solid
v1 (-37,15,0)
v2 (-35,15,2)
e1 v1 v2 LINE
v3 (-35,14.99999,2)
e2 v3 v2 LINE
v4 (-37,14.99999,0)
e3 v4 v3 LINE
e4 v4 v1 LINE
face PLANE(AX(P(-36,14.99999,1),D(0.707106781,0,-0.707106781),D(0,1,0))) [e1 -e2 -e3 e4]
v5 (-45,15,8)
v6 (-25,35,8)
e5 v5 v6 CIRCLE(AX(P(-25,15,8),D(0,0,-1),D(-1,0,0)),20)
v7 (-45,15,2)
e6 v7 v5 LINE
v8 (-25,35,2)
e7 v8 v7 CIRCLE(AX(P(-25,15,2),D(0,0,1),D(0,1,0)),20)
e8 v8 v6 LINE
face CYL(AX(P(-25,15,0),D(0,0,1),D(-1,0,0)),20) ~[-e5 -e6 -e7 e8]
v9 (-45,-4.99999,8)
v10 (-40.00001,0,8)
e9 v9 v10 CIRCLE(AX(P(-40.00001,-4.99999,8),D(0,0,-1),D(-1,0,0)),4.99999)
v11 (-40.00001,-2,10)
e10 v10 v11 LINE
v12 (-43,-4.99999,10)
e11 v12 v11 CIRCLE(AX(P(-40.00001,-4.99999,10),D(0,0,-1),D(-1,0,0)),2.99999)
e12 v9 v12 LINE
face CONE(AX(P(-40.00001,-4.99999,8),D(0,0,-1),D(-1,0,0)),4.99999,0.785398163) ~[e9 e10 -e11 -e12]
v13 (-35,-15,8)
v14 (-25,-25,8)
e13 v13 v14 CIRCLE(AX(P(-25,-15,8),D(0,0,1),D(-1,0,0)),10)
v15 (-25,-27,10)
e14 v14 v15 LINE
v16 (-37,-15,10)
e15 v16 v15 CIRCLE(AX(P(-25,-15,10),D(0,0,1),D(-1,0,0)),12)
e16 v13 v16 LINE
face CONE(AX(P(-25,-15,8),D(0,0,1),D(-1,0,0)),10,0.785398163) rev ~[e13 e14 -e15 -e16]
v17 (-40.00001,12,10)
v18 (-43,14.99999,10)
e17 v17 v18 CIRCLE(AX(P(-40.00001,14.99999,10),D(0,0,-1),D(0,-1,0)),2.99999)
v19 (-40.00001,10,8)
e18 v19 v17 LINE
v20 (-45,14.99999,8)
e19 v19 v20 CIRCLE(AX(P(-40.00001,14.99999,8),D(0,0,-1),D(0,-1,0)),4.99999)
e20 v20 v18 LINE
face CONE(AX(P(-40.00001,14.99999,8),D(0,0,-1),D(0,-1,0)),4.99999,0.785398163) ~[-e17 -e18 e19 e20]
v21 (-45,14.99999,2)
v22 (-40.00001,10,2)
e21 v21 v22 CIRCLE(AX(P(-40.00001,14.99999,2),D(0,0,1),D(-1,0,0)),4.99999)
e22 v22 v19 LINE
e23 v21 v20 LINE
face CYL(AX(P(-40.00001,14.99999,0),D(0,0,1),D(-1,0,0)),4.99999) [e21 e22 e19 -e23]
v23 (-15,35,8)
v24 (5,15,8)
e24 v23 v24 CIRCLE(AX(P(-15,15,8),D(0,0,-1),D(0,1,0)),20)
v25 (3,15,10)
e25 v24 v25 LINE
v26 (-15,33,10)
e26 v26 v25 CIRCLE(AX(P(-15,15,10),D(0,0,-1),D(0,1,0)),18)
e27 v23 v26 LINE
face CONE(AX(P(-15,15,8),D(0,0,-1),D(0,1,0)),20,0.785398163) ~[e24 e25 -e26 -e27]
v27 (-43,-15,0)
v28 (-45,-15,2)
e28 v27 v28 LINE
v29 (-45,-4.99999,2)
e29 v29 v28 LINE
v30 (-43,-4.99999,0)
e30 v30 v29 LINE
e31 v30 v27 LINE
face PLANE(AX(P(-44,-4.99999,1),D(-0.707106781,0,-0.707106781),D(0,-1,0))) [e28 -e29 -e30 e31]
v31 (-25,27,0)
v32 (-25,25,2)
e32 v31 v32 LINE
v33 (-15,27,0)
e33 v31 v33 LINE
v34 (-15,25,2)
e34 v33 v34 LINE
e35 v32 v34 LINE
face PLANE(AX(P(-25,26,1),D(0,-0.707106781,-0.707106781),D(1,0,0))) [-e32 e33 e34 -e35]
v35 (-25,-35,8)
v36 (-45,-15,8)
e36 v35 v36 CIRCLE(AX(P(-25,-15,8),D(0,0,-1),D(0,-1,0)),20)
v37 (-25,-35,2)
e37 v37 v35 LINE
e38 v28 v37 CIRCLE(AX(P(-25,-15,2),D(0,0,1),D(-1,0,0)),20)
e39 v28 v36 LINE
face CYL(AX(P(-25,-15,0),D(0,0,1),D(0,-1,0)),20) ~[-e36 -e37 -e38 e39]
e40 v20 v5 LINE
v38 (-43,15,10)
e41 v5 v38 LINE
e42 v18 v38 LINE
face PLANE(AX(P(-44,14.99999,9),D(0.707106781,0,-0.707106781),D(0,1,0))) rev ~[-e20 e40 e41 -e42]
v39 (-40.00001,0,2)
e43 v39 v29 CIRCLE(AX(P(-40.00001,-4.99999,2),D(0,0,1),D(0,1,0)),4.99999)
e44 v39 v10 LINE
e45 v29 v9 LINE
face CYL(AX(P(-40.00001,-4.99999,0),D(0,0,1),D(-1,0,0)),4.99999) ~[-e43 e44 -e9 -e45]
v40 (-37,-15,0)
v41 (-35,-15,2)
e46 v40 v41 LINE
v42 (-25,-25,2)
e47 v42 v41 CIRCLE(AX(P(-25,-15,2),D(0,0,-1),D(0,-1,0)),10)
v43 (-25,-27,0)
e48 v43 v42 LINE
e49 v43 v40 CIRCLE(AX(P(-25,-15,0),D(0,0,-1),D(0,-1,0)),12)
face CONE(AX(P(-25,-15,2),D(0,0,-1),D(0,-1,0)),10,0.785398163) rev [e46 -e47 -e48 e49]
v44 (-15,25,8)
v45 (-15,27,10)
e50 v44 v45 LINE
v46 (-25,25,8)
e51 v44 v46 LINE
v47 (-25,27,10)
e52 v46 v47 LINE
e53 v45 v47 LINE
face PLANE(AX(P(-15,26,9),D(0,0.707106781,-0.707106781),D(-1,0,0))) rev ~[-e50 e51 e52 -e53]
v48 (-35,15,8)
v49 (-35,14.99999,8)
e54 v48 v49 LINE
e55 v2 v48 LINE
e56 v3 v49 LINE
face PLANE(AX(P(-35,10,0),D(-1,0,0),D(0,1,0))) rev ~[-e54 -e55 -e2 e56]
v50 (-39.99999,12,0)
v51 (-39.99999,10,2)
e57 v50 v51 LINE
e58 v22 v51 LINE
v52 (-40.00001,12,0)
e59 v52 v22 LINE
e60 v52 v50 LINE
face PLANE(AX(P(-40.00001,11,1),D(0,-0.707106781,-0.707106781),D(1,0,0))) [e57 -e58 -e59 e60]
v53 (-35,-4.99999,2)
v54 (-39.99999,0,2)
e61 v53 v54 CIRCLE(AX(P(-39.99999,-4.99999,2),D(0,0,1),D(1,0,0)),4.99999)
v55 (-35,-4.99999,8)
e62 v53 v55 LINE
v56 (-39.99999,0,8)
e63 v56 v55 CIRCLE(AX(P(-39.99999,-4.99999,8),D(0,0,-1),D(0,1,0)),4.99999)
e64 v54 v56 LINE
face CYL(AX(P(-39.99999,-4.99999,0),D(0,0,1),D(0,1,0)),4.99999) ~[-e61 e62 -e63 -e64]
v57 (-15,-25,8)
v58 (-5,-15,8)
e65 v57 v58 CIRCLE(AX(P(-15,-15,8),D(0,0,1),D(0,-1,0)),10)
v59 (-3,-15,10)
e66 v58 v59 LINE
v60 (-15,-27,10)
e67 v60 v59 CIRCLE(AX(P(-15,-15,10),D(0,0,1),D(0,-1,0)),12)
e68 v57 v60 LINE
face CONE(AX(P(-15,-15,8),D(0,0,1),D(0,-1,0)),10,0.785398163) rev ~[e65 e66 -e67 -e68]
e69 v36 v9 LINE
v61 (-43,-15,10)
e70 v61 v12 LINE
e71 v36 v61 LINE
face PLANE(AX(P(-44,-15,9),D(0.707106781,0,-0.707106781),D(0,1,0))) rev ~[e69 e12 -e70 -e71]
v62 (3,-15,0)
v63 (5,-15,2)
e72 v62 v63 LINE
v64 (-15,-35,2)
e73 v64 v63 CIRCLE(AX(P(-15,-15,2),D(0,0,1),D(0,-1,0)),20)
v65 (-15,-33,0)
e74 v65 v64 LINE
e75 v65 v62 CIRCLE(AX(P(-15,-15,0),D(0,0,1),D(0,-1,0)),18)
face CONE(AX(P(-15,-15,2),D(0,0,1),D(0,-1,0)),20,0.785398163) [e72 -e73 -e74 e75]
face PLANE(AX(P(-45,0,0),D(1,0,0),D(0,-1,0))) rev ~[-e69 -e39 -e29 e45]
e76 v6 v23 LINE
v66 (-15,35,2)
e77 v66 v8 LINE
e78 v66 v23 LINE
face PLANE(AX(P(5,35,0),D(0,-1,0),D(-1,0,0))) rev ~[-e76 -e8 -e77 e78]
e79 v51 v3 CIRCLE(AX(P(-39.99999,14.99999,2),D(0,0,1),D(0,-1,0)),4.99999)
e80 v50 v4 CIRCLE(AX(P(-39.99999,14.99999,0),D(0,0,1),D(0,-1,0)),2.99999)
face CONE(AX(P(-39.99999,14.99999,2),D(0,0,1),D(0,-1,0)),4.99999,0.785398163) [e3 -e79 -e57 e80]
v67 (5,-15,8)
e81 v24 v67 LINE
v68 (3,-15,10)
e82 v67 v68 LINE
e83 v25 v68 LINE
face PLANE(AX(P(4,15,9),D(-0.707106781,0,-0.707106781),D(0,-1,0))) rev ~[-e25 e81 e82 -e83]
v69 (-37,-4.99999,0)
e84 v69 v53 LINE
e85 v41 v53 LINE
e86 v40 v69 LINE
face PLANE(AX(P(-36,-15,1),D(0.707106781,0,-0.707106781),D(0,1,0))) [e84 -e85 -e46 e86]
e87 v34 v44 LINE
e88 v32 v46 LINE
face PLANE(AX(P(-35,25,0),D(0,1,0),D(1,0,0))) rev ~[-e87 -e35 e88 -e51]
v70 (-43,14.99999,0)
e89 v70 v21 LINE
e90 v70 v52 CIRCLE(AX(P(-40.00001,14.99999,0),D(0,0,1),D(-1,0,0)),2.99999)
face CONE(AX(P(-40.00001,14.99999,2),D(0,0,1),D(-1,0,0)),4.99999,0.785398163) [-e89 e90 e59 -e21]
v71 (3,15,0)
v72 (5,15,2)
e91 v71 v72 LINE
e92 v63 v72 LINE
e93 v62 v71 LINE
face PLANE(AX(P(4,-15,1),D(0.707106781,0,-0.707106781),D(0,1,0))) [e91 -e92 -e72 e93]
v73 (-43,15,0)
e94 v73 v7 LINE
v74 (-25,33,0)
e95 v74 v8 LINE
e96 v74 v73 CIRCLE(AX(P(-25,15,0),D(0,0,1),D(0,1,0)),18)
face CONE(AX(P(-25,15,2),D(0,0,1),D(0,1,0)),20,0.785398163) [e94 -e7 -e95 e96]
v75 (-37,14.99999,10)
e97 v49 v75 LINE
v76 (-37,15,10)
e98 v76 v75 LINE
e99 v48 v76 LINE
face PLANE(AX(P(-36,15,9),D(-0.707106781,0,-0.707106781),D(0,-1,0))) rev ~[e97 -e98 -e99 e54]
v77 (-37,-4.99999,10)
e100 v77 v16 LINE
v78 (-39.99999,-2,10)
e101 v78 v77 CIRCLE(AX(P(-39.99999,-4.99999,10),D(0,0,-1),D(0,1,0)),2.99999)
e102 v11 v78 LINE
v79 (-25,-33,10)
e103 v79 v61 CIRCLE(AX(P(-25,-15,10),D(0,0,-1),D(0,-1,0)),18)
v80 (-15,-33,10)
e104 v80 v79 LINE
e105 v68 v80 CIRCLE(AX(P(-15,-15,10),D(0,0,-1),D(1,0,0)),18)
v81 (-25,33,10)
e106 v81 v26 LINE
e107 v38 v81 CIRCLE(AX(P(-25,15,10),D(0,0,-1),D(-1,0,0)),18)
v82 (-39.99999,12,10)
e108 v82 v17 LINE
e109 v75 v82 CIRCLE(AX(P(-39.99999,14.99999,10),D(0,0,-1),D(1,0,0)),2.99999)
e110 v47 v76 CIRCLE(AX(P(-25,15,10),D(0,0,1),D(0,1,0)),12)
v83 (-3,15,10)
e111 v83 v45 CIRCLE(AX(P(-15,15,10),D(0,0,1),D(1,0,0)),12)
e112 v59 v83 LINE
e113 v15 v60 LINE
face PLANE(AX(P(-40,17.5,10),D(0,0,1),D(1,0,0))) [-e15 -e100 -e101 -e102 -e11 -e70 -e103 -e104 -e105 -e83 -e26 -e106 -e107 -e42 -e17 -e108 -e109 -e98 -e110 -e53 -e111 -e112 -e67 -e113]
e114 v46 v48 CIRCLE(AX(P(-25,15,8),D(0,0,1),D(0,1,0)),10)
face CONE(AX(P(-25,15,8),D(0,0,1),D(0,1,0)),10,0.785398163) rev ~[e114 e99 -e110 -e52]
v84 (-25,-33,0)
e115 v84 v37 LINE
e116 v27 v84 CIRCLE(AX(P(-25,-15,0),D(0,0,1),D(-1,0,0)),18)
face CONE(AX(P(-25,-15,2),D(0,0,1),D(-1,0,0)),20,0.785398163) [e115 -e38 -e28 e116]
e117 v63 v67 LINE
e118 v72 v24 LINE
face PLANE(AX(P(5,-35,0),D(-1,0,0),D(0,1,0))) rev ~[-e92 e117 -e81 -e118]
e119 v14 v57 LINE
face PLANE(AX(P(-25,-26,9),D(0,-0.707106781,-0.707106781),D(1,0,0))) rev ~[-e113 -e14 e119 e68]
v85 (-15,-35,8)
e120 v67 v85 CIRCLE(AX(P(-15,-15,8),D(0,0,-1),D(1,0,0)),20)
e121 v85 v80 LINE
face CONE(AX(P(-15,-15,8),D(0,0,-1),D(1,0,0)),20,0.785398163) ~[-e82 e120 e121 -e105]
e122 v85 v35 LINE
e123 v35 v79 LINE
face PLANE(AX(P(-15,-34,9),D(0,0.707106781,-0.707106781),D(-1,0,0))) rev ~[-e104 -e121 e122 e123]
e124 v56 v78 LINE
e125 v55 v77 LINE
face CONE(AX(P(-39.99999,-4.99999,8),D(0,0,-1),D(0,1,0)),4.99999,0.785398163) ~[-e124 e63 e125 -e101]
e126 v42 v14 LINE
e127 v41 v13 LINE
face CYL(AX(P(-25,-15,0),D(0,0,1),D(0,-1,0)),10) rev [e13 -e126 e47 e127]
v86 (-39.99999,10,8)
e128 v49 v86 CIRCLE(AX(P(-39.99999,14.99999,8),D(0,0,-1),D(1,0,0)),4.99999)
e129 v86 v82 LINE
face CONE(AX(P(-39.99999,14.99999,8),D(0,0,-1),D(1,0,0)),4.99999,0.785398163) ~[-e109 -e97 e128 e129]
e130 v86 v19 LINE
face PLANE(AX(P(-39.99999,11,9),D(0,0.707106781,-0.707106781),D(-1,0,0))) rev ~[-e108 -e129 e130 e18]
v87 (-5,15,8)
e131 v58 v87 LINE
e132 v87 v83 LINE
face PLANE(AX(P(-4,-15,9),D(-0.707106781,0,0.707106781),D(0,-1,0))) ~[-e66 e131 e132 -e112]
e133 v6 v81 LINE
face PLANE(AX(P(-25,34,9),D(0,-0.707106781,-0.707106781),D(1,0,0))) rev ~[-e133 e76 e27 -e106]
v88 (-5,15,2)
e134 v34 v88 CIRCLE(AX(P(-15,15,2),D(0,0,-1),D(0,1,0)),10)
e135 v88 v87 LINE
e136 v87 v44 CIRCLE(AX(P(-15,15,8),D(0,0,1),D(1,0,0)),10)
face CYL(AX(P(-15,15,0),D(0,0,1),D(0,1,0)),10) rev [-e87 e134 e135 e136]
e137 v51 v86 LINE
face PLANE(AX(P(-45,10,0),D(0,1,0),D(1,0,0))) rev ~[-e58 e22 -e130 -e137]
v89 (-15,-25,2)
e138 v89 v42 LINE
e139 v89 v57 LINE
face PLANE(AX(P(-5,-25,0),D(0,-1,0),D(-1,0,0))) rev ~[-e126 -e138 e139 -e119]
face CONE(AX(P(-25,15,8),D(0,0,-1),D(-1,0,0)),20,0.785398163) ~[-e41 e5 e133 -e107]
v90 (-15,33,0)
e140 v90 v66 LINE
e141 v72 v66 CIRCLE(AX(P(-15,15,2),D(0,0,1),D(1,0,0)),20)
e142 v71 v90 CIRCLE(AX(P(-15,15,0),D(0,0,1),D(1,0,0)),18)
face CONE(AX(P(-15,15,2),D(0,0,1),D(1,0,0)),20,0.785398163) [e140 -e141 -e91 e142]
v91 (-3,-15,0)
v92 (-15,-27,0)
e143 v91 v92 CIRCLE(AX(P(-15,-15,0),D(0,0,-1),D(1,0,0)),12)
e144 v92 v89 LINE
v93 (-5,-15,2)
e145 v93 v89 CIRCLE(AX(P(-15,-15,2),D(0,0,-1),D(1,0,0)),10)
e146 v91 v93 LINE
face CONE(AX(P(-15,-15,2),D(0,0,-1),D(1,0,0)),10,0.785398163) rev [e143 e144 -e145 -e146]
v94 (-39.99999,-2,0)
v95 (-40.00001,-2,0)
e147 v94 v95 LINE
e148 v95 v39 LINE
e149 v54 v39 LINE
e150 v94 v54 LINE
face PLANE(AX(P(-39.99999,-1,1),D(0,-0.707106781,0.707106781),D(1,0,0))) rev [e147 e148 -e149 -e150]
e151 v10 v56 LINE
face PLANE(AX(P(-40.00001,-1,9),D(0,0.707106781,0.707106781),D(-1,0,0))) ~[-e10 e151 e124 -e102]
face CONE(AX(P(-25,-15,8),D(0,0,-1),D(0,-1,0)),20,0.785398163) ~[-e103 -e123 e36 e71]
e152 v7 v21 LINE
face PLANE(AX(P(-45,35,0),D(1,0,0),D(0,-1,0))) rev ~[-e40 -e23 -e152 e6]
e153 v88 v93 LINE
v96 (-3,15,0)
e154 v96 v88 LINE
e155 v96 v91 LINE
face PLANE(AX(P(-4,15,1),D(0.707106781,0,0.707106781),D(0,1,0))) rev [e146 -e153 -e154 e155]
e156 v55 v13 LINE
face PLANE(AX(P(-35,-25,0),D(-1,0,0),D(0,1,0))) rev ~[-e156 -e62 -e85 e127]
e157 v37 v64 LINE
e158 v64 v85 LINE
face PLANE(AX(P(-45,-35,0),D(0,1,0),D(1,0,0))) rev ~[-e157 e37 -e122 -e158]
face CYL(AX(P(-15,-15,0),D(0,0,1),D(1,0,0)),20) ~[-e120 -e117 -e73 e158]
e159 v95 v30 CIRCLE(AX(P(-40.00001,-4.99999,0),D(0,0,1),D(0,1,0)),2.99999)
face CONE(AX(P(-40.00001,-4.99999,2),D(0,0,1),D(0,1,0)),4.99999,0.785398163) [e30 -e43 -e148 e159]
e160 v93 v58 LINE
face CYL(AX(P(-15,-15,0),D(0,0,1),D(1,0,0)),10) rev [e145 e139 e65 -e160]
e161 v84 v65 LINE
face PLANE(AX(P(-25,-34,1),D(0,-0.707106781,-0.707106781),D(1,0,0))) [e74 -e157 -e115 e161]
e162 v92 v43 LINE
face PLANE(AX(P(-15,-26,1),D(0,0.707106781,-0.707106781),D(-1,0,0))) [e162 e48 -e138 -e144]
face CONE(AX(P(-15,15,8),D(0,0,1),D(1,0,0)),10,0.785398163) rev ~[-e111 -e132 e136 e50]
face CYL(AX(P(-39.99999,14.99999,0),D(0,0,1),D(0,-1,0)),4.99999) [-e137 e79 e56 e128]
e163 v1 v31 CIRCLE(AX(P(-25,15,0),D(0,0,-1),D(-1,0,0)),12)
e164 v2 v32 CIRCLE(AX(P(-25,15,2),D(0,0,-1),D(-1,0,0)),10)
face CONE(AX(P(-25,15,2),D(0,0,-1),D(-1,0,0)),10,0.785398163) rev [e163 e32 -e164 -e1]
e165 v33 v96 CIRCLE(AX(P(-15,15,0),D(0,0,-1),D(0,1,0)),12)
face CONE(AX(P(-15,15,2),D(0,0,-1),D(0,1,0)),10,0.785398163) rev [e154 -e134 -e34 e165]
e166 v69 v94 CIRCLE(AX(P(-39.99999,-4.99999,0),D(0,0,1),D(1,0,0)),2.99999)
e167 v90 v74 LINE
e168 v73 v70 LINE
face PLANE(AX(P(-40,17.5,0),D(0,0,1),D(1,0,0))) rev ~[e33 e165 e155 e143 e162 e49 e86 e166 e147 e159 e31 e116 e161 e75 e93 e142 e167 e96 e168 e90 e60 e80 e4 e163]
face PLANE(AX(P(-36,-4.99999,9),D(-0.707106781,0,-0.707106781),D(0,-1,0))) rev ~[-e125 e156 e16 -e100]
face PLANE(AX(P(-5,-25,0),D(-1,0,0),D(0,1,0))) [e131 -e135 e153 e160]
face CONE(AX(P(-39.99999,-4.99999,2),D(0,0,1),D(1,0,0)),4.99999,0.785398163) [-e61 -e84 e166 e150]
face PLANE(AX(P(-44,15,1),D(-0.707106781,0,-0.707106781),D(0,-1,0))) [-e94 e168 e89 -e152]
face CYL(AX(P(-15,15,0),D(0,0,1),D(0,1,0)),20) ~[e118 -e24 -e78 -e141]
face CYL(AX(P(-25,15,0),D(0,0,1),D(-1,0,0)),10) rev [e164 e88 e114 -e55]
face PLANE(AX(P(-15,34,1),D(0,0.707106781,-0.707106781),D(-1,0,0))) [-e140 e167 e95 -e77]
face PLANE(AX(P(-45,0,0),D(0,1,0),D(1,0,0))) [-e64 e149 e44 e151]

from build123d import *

# Parameters (mm, degrees)
F0_W     = 10
F0_H     = 15
F0_H_2   = 50
F0_H_3   = 25
F1_DEPTH = 10
F2_R     = 10
F3_R     = 20
F4_R     = 4.99999
F5_SIZE  = 2


# Not quite as in the source:
# - a fillet or chamfer is up to 0.001 mm smaller than in the source, because OpenCascade refuses the exact size


with BuildPart() as f1:
    # F0 (on Top) → F1 (new body)
    with BuildSketch(Plane.XY):
        with Locations((-40, 17.5)):
            Rectangle(F0_W, F0_H)
        Polygon((-35, 25), (-5, 25), (5, 25), (5, 35), (-45, 35), (-45, 25), align=None)
        Rectangle(F0_W, F0_H_2)
        Polygon((5, -25), (-5, -25), (-35, -25), (-45, -25), (-45, -35), (5, -35), align=None)
        with Locations((-40, -12.5)):
            Rectangle(F0_W, F0_H_3)
    extrude(amount=F1_DEPTH)

    # F2
    f2_edges = [f1.edges().sort_by_distance(p)[0] for p in [
        (-35, 25, 5),
        (-5, 25, 5),
        (-5, -25, 5),
        (-35, -25, 5),
    ]]
    fillet(f2_edges, radius=F2_R)

    # F3
    f3_edges = [f1.edges().sort_by_distance(p)[0] for p in [
        (5, 35, 5),
        (-45, 35, 5),
        (5, -35, 5),
        (-45, -35, 5),
    ]]
    fillet(f3_edges, radius=F3_R)

    # F4 (radius 5 in the source; OpenCascade refuses exactly that, so slightly less here)
    f4_edges = [f1.edges().sort_by_distance(p)[0] for p in [
        (-35, 10, 5),
        (-45, 10, 5),
        (-45, 0, 5),
        (-35, 0, 5),
    ]]
    fillet(f4_edges, radius=F4_R)

    # F5
    f5_edges = [f1.edges().sort_by_distance(p)[0] for p in [
        (-45, -9.999995, 0),
        (-39.142136, -29.142136, 10),
    ]]
    chamfer(f5_edges, length=F5_SIZE)


solid = f1.part
